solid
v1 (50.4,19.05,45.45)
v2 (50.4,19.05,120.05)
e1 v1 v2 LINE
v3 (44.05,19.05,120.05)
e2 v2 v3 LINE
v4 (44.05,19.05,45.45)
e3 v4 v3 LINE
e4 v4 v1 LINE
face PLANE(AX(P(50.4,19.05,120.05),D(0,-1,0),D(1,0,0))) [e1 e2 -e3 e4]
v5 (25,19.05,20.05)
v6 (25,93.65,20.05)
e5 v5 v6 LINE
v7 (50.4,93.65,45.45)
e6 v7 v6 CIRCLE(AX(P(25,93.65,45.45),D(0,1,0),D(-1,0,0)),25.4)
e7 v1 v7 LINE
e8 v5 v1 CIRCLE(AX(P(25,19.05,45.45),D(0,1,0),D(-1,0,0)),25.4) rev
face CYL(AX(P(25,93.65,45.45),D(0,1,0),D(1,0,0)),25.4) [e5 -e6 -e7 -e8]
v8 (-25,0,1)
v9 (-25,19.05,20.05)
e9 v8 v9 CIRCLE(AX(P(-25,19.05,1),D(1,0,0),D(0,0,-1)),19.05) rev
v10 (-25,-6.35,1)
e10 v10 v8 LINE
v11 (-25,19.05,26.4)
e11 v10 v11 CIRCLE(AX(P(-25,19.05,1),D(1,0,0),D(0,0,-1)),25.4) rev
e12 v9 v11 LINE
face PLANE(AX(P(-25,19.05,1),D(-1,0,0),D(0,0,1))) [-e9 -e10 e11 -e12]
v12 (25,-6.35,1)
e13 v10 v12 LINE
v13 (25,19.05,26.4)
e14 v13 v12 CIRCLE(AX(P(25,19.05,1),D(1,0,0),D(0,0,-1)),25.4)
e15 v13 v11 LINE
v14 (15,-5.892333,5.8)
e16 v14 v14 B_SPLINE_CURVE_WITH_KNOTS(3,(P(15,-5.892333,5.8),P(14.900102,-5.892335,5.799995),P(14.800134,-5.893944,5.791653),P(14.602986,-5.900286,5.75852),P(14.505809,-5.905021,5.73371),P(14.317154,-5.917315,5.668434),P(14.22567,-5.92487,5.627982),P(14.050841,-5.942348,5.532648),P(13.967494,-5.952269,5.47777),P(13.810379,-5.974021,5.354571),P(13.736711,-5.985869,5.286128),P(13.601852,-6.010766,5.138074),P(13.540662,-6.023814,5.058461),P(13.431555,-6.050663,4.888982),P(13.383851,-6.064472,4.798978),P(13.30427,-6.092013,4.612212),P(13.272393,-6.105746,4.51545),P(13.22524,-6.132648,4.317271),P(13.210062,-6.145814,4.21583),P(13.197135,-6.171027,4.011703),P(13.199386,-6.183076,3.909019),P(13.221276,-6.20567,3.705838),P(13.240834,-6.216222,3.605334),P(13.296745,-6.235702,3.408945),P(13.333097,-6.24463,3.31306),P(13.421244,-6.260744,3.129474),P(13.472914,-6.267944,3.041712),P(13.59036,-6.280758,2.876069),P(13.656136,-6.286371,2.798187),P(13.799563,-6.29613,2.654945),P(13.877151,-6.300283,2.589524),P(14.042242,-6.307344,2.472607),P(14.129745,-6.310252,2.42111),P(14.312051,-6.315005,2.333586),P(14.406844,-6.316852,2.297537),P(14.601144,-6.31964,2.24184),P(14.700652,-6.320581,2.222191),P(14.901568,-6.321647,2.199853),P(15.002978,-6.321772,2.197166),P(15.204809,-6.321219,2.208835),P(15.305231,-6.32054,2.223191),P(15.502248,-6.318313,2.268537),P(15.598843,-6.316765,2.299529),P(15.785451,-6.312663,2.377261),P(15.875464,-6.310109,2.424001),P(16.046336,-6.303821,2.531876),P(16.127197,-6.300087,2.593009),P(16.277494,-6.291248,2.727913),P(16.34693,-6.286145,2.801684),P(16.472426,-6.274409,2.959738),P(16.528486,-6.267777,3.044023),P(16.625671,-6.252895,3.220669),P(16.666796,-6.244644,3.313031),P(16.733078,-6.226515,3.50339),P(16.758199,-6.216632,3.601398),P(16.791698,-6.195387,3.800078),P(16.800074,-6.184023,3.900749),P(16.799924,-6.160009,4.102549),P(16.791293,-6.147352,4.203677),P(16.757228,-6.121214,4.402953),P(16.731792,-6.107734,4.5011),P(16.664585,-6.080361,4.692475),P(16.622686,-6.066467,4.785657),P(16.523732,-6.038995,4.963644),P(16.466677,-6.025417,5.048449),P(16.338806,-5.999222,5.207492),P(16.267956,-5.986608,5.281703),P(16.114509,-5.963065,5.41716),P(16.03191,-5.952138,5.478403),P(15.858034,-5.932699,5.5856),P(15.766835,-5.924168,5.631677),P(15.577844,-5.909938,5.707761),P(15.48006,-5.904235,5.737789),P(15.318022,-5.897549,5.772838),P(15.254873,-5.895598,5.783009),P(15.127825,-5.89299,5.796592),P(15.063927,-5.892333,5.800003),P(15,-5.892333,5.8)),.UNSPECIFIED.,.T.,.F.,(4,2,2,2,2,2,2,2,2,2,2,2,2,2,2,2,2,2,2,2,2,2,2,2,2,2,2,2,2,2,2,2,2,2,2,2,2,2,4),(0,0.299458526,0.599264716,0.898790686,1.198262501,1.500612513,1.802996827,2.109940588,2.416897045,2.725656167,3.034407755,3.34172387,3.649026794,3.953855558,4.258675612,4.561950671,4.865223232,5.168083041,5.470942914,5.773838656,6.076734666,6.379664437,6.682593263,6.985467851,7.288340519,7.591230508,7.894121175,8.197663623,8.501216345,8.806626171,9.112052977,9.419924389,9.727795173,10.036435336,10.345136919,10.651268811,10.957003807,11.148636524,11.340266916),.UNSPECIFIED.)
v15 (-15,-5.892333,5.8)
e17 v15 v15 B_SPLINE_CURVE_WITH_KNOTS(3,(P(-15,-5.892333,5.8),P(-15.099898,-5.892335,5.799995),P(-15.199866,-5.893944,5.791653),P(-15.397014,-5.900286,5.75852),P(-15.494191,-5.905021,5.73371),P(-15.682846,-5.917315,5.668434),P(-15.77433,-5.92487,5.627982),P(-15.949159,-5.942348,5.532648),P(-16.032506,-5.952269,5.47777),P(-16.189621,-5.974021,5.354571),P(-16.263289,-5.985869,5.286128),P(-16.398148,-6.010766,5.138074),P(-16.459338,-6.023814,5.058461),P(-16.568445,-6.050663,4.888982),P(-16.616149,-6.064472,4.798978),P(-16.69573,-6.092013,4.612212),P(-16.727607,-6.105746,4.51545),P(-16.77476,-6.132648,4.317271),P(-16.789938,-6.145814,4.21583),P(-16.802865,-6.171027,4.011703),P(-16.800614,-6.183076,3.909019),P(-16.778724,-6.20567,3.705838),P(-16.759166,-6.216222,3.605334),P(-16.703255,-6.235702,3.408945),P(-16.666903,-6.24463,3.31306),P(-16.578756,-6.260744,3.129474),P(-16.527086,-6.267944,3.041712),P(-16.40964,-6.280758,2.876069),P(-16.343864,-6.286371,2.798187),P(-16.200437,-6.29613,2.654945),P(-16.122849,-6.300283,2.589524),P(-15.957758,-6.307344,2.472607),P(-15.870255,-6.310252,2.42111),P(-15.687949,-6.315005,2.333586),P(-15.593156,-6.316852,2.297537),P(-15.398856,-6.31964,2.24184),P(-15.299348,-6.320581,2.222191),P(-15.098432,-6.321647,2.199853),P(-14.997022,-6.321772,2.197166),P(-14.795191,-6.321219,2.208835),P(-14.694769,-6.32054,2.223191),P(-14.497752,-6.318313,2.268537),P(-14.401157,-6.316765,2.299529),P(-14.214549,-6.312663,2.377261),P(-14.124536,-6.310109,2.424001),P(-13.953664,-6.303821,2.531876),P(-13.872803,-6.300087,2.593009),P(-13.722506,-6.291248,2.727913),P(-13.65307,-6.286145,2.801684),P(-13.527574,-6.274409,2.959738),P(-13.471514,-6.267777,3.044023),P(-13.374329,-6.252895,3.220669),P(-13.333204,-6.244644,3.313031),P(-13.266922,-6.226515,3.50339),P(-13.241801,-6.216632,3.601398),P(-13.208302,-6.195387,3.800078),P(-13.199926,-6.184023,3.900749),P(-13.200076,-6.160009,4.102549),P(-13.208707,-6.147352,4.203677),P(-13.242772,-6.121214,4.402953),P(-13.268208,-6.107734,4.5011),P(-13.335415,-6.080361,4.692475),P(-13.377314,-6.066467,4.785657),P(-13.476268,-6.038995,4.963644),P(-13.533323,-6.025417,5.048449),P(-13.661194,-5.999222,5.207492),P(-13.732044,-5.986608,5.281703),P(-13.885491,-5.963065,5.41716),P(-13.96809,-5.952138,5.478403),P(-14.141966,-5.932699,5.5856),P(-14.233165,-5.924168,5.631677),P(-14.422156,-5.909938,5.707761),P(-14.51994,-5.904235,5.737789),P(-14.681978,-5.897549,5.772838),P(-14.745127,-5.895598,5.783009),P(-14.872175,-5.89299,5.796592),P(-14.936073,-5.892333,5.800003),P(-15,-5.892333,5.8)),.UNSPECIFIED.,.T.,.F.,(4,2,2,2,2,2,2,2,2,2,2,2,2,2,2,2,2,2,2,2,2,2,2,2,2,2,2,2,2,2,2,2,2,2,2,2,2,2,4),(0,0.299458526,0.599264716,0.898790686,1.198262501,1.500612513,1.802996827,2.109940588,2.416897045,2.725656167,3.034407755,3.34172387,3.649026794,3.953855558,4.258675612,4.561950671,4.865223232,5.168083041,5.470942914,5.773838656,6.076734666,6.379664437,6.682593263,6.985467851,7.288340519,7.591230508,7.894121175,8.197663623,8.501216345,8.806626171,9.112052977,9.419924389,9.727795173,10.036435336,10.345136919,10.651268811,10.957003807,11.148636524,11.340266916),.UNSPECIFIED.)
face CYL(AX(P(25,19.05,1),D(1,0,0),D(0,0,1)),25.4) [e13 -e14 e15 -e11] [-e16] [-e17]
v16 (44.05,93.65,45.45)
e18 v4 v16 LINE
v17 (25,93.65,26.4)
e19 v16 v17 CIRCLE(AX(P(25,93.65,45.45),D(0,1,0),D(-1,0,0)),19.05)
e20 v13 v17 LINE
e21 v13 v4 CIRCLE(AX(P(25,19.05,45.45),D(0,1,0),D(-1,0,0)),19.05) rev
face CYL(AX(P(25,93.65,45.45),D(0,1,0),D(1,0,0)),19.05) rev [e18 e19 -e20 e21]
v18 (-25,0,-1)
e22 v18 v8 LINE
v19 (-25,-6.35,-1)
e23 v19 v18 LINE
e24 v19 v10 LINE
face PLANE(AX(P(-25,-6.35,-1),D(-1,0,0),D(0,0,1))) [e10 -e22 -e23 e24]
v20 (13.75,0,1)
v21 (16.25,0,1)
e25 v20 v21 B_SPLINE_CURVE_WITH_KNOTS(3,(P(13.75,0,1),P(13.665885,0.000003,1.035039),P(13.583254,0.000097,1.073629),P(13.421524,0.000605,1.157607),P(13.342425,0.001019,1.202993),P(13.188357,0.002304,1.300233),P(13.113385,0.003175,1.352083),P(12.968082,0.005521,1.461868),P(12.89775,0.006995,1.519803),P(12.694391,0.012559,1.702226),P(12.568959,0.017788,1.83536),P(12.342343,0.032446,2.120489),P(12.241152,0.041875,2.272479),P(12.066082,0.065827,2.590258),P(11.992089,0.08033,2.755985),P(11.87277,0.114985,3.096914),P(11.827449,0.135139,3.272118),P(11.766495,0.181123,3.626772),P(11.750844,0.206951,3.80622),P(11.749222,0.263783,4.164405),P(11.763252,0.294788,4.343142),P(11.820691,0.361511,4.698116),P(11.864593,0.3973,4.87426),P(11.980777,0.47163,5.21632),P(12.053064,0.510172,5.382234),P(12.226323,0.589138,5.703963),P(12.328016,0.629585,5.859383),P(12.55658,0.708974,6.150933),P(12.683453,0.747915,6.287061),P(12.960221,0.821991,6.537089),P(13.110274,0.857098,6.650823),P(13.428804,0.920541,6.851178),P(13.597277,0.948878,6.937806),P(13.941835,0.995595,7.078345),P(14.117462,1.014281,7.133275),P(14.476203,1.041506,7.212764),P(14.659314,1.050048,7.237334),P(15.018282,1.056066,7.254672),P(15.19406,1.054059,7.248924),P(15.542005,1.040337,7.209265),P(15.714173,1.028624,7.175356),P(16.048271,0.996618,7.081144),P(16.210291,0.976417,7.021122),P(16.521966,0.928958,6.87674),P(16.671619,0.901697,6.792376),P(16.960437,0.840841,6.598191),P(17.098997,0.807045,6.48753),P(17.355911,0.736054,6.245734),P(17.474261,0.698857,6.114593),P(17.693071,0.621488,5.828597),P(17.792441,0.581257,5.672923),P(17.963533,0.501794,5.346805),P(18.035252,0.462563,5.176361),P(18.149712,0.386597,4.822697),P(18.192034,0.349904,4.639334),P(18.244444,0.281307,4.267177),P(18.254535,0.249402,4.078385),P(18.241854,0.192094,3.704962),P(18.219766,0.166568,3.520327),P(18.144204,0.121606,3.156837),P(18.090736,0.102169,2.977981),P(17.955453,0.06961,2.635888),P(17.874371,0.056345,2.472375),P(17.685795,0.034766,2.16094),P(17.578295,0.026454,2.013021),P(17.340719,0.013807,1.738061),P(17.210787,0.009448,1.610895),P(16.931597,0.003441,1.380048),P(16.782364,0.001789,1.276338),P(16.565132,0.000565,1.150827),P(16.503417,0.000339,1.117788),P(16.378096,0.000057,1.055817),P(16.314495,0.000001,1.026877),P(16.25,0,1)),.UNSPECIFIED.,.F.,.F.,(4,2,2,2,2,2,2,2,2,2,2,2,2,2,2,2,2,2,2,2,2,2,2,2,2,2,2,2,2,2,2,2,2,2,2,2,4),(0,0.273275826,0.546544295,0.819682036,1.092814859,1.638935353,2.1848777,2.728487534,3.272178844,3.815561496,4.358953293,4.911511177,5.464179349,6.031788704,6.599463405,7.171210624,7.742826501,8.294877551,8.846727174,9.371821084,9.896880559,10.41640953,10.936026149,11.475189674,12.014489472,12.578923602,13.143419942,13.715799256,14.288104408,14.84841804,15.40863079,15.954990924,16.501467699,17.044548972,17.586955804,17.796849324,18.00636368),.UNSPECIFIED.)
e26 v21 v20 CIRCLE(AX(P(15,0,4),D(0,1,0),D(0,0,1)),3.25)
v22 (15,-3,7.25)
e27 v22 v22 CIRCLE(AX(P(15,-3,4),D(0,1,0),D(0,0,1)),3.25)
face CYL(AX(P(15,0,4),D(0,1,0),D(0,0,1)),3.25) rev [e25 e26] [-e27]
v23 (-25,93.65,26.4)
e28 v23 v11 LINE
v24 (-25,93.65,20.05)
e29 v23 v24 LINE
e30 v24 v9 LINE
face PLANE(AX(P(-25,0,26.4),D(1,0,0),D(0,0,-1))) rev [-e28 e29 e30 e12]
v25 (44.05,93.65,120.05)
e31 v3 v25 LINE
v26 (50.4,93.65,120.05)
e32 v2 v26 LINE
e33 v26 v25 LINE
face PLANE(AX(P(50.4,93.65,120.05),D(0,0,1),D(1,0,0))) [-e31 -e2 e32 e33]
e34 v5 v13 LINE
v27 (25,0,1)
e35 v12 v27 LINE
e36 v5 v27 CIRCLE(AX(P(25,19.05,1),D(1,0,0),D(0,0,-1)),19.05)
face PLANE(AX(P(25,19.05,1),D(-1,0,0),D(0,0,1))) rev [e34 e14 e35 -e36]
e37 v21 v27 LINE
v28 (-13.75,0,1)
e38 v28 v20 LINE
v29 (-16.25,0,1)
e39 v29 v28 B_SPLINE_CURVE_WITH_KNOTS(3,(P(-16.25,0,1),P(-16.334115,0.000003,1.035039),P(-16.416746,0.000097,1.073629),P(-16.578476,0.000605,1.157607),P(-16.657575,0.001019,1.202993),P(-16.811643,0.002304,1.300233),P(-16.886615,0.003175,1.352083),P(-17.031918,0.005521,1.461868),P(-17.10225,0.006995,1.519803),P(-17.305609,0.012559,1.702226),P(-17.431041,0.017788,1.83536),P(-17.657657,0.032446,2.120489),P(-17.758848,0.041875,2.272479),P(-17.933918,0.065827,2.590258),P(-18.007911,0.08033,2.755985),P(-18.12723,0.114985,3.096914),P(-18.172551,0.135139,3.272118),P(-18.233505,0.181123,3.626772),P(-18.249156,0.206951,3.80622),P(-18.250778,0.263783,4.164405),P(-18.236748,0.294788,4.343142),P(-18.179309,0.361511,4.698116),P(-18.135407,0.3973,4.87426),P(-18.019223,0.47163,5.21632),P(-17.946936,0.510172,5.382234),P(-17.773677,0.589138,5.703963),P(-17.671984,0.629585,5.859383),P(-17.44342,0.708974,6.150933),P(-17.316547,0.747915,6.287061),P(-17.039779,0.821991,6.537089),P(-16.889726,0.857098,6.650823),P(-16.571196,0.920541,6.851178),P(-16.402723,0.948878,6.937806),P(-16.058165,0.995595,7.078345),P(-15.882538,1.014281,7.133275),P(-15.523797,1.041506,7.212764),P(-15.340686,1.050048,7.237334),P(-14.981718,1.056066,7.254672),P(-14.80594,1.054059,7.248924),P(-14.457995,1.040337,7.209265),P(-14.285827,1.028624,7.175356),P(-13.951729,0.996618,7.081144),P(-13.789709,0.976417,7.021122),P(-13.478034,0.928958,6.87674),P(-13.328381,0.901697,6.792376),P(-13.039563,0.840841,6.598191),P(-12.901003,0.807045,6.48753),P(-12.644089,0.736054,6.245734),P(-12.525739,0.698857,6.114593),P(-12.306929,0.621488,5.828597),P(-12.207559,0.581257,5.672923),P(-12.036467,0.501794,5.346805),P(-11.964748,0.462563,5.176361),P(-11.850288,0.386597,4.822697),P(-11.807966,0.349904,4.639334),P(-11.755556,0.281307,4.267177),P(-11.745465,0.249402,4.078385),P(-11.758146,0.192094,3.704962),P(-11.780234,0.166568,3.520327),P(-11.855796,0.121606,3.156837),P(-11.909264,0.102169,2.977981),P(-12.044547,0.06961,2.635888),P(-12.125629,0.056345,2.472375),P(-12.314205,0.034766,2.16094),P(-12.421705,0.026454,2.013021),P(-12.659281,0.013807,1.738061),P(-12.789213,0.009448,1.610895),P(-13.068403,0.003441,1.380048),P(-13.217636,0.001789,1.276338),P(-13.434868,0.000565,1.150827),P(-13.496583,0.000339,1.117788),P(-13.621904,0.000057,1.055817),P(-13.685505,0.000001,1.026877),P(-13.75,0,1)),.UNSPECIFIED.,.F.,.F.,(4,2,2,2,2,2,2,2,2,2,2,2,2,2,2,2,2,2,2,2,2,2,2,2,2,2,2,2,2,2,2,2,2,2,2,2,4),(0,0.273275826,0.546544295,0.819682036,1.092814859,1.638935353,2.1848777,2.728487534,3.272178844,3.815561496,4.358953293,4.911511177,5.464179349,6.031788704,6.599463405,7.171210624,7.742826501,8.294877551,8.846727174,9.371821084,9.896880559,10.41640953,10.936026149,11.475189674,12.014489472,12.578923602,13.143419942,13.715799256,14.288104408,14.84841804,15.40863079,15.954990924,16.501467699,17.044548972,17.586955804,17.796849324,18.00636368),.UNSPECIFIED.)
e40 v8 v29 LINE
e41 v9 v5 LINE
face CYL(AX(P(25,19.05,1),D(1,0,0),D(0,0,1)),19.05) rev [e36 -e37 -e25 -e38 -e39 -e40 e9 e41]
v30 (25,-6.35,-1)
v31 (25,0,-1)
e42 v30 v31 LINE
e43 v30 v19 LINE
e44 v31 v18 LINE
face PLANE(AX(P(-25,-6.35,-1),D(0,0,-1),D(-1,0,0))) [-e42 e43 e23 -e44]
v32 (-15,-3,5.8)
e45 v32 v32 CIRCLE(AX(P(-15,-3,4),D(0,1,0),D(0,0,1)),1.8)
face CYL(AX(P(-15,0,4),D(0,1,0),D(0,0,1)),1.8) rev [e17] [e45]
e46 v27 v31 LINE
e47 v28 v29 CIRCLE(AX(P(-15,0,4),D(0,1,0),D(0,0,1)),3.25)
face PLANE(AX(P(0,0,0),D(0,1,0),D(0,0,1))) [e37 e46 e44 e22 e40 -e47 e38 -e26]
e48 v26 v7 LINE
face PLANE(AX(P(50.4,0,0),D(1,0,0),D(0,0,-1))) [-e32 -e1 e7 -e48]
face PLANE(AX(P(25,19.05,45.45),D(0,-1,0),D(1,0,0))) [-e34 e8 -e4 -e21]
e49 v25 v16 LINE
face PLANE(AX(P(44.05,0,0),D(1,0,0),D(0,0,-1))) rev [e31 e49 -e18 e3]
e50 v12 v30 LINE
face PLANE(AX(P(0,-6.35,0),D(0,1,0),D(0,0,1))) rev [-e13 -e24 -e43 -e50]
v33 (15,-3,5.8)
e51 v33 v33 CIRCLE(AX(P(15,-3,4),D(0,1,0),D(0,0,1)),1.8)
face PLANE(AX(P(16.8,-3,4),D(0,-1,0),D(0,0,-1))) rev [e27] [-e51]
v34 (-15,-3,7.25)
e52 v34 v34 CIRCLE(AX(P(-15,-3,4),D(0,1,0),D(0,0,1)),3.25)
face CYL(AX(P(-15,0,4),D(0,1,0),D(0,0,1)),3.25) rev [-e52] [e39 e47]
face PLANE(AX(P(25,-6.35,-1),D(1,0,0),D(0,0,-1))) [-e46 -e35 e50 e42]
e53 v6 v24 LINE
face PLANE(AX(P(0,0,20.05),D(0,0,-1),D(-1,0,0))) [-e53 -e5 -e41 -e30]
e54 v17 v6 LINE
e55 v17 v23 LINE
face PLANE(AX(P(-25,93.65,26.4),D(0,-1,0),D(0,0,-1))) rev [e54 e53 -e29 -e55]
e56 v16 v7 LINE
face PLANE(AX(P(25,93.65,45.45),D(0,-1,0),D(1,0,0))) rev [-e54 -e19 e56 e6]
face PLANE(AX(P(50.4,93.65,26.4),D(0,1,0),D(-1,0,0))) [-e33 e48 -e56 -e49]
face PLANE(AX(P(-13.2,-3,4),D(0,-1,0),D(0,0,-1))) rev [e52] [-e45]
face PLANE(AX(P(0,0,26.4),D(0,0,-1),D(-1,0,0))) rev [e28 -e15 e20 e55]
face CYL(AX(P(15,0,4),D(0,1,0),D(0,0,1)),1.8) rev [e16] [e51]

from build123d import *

# Parameters (mm, degrees)
SKETCH1_W                     = 50
SKETCH1_H                     = 2
BASE_FLANGE1_DEPTH            = 6.35
EDGE_FLANGE2_DEPTH            = 50
CBORE_FOR_M3_SHCS1_AT_2_COUNT = 2
CBORE_FOR_M3_SHCS1_AT_2_PITCH = 30
EDGE_FLANGE3_DEPTH            = 74.6
CUT_EXTRUDE2_START            = 10
SKETCH23_R                    = 3.25
CUT_EXTRUDE2_DEPTH            = 10


# Sheet-metal steps are written as plain solids
with BuildPart() as part:
    # Sketch1 → Base-Flange1 (new body)
    with BuildSketch(Plane(origin=(0, 0, 0), x_dir=(1, 0, 0), z_dir=(0, 1, 0))):
        Rectangle(SKETCH1_W, SKETCH1_H)
    extrude(amount=-BASE_FLANGE1_DEPTH)

    # Edge-Flange2 section (across the edge) → Edge-Flange2 (add)
    with BuildSketch(Plane(origin=(-25, 0, 20.05), x_dir=(0, 0, -1), z_dir=(1, 0, 0))):
        with BuildLine():
            Line((-6.35, 19.05), (-6.35, 93.65))
            Line((-6.35, 93.65), (0, 93.65))
            Line((0, 93.65), (0, 19.05))
            ThreePointArc((0, 19.05), (5.579615818, 5.579615818), (19.05, 0))
            Line((19.05, 0), (19.05, -6.35))
            ThreePointArc((19.05, -6.35), (1.089487758, 1.089487758), (-6.35, 19.05))
        make_face()
    extrude(amount=EDGE_FLANGE2_DEPTH)

    # Sketch19 → CBORE for M3 SHCS1 (revolve, cut)
    with BuildSketch(Plane(origin=(-15, 0, 4), x_dir=(0, 0, 1), z_dir=(1, 0, 0))):
        Polygon((0, 0), (0, 6.35), (1.8, 6.35), (1.8, 3), (3.25, 3), (3.25, 0), align=None)
    cbore_for_m3_shcs1 = revolve(axis=Axis((-15, 6.35, 4), (0, -1, 0)), mode=Mode.SUBTRACT)

    # CBORE for M3 SHCS1 at 2: CBORE for M3 SHCS1 ×2
    with Locations(*[(i * CBORE_FOR_M3_SHCS1_AT_2_PITCH, 0, 0) for i in range(1, CBORE_FOR_M3_SHCS1_AT_2_COUNT)]):
        add(cbore_for_m3_shcs1, mode=Mode.SUBTRACT)

    # Edge-Flange3 section (across the edge) → Edge-Flange3 (add)
    with BuildSketch(Plane(origin=(44.05, 19.05, 26.4), x_dir=(-1, 0, 0), z_dir=(0, 1, 0))):
        with BuildLine():
            Line((-6.35, 19.05), (-6.35, 93.65))
            Line((-6.35, 93.65), (0, 93.65))
            Line((0, 93.65), (0, 19.05))
            ThreePointArc((0, 19.05), (5.579615818, 5.579615818), (19.05, 0))
            Line((19.05, 0), (19.05, -6.35))
            ThreePointArc((19.05, -6.35), (1.089487758, 1.089487758), (-6.35, 19.05))
        make_face()
    extrude(amount=EDGE_FLANGE3_DEPTH)

    # Sketch23 → Cut-Extrude2 (cut)
    with BuildSketch(Plane(origin=(0, 0, 0), x_dir=(1, 0, 0), z_dir=(0, 1, 0)).offset(CUT_EXTRUDE2_START)):
        with Locations(Location((15, -4, 0), (0, 0, 270))):
            Circle(SKETCH23_R)
        with Locations(Location((-15, -4, 0), (0, 0, 270))):
            Circle(SKETCH23_R)
    extrude(amount=-CUT_EXTRUDE2_DEPTH, mode=Mode.SUBTRACT)


solid = part.part
